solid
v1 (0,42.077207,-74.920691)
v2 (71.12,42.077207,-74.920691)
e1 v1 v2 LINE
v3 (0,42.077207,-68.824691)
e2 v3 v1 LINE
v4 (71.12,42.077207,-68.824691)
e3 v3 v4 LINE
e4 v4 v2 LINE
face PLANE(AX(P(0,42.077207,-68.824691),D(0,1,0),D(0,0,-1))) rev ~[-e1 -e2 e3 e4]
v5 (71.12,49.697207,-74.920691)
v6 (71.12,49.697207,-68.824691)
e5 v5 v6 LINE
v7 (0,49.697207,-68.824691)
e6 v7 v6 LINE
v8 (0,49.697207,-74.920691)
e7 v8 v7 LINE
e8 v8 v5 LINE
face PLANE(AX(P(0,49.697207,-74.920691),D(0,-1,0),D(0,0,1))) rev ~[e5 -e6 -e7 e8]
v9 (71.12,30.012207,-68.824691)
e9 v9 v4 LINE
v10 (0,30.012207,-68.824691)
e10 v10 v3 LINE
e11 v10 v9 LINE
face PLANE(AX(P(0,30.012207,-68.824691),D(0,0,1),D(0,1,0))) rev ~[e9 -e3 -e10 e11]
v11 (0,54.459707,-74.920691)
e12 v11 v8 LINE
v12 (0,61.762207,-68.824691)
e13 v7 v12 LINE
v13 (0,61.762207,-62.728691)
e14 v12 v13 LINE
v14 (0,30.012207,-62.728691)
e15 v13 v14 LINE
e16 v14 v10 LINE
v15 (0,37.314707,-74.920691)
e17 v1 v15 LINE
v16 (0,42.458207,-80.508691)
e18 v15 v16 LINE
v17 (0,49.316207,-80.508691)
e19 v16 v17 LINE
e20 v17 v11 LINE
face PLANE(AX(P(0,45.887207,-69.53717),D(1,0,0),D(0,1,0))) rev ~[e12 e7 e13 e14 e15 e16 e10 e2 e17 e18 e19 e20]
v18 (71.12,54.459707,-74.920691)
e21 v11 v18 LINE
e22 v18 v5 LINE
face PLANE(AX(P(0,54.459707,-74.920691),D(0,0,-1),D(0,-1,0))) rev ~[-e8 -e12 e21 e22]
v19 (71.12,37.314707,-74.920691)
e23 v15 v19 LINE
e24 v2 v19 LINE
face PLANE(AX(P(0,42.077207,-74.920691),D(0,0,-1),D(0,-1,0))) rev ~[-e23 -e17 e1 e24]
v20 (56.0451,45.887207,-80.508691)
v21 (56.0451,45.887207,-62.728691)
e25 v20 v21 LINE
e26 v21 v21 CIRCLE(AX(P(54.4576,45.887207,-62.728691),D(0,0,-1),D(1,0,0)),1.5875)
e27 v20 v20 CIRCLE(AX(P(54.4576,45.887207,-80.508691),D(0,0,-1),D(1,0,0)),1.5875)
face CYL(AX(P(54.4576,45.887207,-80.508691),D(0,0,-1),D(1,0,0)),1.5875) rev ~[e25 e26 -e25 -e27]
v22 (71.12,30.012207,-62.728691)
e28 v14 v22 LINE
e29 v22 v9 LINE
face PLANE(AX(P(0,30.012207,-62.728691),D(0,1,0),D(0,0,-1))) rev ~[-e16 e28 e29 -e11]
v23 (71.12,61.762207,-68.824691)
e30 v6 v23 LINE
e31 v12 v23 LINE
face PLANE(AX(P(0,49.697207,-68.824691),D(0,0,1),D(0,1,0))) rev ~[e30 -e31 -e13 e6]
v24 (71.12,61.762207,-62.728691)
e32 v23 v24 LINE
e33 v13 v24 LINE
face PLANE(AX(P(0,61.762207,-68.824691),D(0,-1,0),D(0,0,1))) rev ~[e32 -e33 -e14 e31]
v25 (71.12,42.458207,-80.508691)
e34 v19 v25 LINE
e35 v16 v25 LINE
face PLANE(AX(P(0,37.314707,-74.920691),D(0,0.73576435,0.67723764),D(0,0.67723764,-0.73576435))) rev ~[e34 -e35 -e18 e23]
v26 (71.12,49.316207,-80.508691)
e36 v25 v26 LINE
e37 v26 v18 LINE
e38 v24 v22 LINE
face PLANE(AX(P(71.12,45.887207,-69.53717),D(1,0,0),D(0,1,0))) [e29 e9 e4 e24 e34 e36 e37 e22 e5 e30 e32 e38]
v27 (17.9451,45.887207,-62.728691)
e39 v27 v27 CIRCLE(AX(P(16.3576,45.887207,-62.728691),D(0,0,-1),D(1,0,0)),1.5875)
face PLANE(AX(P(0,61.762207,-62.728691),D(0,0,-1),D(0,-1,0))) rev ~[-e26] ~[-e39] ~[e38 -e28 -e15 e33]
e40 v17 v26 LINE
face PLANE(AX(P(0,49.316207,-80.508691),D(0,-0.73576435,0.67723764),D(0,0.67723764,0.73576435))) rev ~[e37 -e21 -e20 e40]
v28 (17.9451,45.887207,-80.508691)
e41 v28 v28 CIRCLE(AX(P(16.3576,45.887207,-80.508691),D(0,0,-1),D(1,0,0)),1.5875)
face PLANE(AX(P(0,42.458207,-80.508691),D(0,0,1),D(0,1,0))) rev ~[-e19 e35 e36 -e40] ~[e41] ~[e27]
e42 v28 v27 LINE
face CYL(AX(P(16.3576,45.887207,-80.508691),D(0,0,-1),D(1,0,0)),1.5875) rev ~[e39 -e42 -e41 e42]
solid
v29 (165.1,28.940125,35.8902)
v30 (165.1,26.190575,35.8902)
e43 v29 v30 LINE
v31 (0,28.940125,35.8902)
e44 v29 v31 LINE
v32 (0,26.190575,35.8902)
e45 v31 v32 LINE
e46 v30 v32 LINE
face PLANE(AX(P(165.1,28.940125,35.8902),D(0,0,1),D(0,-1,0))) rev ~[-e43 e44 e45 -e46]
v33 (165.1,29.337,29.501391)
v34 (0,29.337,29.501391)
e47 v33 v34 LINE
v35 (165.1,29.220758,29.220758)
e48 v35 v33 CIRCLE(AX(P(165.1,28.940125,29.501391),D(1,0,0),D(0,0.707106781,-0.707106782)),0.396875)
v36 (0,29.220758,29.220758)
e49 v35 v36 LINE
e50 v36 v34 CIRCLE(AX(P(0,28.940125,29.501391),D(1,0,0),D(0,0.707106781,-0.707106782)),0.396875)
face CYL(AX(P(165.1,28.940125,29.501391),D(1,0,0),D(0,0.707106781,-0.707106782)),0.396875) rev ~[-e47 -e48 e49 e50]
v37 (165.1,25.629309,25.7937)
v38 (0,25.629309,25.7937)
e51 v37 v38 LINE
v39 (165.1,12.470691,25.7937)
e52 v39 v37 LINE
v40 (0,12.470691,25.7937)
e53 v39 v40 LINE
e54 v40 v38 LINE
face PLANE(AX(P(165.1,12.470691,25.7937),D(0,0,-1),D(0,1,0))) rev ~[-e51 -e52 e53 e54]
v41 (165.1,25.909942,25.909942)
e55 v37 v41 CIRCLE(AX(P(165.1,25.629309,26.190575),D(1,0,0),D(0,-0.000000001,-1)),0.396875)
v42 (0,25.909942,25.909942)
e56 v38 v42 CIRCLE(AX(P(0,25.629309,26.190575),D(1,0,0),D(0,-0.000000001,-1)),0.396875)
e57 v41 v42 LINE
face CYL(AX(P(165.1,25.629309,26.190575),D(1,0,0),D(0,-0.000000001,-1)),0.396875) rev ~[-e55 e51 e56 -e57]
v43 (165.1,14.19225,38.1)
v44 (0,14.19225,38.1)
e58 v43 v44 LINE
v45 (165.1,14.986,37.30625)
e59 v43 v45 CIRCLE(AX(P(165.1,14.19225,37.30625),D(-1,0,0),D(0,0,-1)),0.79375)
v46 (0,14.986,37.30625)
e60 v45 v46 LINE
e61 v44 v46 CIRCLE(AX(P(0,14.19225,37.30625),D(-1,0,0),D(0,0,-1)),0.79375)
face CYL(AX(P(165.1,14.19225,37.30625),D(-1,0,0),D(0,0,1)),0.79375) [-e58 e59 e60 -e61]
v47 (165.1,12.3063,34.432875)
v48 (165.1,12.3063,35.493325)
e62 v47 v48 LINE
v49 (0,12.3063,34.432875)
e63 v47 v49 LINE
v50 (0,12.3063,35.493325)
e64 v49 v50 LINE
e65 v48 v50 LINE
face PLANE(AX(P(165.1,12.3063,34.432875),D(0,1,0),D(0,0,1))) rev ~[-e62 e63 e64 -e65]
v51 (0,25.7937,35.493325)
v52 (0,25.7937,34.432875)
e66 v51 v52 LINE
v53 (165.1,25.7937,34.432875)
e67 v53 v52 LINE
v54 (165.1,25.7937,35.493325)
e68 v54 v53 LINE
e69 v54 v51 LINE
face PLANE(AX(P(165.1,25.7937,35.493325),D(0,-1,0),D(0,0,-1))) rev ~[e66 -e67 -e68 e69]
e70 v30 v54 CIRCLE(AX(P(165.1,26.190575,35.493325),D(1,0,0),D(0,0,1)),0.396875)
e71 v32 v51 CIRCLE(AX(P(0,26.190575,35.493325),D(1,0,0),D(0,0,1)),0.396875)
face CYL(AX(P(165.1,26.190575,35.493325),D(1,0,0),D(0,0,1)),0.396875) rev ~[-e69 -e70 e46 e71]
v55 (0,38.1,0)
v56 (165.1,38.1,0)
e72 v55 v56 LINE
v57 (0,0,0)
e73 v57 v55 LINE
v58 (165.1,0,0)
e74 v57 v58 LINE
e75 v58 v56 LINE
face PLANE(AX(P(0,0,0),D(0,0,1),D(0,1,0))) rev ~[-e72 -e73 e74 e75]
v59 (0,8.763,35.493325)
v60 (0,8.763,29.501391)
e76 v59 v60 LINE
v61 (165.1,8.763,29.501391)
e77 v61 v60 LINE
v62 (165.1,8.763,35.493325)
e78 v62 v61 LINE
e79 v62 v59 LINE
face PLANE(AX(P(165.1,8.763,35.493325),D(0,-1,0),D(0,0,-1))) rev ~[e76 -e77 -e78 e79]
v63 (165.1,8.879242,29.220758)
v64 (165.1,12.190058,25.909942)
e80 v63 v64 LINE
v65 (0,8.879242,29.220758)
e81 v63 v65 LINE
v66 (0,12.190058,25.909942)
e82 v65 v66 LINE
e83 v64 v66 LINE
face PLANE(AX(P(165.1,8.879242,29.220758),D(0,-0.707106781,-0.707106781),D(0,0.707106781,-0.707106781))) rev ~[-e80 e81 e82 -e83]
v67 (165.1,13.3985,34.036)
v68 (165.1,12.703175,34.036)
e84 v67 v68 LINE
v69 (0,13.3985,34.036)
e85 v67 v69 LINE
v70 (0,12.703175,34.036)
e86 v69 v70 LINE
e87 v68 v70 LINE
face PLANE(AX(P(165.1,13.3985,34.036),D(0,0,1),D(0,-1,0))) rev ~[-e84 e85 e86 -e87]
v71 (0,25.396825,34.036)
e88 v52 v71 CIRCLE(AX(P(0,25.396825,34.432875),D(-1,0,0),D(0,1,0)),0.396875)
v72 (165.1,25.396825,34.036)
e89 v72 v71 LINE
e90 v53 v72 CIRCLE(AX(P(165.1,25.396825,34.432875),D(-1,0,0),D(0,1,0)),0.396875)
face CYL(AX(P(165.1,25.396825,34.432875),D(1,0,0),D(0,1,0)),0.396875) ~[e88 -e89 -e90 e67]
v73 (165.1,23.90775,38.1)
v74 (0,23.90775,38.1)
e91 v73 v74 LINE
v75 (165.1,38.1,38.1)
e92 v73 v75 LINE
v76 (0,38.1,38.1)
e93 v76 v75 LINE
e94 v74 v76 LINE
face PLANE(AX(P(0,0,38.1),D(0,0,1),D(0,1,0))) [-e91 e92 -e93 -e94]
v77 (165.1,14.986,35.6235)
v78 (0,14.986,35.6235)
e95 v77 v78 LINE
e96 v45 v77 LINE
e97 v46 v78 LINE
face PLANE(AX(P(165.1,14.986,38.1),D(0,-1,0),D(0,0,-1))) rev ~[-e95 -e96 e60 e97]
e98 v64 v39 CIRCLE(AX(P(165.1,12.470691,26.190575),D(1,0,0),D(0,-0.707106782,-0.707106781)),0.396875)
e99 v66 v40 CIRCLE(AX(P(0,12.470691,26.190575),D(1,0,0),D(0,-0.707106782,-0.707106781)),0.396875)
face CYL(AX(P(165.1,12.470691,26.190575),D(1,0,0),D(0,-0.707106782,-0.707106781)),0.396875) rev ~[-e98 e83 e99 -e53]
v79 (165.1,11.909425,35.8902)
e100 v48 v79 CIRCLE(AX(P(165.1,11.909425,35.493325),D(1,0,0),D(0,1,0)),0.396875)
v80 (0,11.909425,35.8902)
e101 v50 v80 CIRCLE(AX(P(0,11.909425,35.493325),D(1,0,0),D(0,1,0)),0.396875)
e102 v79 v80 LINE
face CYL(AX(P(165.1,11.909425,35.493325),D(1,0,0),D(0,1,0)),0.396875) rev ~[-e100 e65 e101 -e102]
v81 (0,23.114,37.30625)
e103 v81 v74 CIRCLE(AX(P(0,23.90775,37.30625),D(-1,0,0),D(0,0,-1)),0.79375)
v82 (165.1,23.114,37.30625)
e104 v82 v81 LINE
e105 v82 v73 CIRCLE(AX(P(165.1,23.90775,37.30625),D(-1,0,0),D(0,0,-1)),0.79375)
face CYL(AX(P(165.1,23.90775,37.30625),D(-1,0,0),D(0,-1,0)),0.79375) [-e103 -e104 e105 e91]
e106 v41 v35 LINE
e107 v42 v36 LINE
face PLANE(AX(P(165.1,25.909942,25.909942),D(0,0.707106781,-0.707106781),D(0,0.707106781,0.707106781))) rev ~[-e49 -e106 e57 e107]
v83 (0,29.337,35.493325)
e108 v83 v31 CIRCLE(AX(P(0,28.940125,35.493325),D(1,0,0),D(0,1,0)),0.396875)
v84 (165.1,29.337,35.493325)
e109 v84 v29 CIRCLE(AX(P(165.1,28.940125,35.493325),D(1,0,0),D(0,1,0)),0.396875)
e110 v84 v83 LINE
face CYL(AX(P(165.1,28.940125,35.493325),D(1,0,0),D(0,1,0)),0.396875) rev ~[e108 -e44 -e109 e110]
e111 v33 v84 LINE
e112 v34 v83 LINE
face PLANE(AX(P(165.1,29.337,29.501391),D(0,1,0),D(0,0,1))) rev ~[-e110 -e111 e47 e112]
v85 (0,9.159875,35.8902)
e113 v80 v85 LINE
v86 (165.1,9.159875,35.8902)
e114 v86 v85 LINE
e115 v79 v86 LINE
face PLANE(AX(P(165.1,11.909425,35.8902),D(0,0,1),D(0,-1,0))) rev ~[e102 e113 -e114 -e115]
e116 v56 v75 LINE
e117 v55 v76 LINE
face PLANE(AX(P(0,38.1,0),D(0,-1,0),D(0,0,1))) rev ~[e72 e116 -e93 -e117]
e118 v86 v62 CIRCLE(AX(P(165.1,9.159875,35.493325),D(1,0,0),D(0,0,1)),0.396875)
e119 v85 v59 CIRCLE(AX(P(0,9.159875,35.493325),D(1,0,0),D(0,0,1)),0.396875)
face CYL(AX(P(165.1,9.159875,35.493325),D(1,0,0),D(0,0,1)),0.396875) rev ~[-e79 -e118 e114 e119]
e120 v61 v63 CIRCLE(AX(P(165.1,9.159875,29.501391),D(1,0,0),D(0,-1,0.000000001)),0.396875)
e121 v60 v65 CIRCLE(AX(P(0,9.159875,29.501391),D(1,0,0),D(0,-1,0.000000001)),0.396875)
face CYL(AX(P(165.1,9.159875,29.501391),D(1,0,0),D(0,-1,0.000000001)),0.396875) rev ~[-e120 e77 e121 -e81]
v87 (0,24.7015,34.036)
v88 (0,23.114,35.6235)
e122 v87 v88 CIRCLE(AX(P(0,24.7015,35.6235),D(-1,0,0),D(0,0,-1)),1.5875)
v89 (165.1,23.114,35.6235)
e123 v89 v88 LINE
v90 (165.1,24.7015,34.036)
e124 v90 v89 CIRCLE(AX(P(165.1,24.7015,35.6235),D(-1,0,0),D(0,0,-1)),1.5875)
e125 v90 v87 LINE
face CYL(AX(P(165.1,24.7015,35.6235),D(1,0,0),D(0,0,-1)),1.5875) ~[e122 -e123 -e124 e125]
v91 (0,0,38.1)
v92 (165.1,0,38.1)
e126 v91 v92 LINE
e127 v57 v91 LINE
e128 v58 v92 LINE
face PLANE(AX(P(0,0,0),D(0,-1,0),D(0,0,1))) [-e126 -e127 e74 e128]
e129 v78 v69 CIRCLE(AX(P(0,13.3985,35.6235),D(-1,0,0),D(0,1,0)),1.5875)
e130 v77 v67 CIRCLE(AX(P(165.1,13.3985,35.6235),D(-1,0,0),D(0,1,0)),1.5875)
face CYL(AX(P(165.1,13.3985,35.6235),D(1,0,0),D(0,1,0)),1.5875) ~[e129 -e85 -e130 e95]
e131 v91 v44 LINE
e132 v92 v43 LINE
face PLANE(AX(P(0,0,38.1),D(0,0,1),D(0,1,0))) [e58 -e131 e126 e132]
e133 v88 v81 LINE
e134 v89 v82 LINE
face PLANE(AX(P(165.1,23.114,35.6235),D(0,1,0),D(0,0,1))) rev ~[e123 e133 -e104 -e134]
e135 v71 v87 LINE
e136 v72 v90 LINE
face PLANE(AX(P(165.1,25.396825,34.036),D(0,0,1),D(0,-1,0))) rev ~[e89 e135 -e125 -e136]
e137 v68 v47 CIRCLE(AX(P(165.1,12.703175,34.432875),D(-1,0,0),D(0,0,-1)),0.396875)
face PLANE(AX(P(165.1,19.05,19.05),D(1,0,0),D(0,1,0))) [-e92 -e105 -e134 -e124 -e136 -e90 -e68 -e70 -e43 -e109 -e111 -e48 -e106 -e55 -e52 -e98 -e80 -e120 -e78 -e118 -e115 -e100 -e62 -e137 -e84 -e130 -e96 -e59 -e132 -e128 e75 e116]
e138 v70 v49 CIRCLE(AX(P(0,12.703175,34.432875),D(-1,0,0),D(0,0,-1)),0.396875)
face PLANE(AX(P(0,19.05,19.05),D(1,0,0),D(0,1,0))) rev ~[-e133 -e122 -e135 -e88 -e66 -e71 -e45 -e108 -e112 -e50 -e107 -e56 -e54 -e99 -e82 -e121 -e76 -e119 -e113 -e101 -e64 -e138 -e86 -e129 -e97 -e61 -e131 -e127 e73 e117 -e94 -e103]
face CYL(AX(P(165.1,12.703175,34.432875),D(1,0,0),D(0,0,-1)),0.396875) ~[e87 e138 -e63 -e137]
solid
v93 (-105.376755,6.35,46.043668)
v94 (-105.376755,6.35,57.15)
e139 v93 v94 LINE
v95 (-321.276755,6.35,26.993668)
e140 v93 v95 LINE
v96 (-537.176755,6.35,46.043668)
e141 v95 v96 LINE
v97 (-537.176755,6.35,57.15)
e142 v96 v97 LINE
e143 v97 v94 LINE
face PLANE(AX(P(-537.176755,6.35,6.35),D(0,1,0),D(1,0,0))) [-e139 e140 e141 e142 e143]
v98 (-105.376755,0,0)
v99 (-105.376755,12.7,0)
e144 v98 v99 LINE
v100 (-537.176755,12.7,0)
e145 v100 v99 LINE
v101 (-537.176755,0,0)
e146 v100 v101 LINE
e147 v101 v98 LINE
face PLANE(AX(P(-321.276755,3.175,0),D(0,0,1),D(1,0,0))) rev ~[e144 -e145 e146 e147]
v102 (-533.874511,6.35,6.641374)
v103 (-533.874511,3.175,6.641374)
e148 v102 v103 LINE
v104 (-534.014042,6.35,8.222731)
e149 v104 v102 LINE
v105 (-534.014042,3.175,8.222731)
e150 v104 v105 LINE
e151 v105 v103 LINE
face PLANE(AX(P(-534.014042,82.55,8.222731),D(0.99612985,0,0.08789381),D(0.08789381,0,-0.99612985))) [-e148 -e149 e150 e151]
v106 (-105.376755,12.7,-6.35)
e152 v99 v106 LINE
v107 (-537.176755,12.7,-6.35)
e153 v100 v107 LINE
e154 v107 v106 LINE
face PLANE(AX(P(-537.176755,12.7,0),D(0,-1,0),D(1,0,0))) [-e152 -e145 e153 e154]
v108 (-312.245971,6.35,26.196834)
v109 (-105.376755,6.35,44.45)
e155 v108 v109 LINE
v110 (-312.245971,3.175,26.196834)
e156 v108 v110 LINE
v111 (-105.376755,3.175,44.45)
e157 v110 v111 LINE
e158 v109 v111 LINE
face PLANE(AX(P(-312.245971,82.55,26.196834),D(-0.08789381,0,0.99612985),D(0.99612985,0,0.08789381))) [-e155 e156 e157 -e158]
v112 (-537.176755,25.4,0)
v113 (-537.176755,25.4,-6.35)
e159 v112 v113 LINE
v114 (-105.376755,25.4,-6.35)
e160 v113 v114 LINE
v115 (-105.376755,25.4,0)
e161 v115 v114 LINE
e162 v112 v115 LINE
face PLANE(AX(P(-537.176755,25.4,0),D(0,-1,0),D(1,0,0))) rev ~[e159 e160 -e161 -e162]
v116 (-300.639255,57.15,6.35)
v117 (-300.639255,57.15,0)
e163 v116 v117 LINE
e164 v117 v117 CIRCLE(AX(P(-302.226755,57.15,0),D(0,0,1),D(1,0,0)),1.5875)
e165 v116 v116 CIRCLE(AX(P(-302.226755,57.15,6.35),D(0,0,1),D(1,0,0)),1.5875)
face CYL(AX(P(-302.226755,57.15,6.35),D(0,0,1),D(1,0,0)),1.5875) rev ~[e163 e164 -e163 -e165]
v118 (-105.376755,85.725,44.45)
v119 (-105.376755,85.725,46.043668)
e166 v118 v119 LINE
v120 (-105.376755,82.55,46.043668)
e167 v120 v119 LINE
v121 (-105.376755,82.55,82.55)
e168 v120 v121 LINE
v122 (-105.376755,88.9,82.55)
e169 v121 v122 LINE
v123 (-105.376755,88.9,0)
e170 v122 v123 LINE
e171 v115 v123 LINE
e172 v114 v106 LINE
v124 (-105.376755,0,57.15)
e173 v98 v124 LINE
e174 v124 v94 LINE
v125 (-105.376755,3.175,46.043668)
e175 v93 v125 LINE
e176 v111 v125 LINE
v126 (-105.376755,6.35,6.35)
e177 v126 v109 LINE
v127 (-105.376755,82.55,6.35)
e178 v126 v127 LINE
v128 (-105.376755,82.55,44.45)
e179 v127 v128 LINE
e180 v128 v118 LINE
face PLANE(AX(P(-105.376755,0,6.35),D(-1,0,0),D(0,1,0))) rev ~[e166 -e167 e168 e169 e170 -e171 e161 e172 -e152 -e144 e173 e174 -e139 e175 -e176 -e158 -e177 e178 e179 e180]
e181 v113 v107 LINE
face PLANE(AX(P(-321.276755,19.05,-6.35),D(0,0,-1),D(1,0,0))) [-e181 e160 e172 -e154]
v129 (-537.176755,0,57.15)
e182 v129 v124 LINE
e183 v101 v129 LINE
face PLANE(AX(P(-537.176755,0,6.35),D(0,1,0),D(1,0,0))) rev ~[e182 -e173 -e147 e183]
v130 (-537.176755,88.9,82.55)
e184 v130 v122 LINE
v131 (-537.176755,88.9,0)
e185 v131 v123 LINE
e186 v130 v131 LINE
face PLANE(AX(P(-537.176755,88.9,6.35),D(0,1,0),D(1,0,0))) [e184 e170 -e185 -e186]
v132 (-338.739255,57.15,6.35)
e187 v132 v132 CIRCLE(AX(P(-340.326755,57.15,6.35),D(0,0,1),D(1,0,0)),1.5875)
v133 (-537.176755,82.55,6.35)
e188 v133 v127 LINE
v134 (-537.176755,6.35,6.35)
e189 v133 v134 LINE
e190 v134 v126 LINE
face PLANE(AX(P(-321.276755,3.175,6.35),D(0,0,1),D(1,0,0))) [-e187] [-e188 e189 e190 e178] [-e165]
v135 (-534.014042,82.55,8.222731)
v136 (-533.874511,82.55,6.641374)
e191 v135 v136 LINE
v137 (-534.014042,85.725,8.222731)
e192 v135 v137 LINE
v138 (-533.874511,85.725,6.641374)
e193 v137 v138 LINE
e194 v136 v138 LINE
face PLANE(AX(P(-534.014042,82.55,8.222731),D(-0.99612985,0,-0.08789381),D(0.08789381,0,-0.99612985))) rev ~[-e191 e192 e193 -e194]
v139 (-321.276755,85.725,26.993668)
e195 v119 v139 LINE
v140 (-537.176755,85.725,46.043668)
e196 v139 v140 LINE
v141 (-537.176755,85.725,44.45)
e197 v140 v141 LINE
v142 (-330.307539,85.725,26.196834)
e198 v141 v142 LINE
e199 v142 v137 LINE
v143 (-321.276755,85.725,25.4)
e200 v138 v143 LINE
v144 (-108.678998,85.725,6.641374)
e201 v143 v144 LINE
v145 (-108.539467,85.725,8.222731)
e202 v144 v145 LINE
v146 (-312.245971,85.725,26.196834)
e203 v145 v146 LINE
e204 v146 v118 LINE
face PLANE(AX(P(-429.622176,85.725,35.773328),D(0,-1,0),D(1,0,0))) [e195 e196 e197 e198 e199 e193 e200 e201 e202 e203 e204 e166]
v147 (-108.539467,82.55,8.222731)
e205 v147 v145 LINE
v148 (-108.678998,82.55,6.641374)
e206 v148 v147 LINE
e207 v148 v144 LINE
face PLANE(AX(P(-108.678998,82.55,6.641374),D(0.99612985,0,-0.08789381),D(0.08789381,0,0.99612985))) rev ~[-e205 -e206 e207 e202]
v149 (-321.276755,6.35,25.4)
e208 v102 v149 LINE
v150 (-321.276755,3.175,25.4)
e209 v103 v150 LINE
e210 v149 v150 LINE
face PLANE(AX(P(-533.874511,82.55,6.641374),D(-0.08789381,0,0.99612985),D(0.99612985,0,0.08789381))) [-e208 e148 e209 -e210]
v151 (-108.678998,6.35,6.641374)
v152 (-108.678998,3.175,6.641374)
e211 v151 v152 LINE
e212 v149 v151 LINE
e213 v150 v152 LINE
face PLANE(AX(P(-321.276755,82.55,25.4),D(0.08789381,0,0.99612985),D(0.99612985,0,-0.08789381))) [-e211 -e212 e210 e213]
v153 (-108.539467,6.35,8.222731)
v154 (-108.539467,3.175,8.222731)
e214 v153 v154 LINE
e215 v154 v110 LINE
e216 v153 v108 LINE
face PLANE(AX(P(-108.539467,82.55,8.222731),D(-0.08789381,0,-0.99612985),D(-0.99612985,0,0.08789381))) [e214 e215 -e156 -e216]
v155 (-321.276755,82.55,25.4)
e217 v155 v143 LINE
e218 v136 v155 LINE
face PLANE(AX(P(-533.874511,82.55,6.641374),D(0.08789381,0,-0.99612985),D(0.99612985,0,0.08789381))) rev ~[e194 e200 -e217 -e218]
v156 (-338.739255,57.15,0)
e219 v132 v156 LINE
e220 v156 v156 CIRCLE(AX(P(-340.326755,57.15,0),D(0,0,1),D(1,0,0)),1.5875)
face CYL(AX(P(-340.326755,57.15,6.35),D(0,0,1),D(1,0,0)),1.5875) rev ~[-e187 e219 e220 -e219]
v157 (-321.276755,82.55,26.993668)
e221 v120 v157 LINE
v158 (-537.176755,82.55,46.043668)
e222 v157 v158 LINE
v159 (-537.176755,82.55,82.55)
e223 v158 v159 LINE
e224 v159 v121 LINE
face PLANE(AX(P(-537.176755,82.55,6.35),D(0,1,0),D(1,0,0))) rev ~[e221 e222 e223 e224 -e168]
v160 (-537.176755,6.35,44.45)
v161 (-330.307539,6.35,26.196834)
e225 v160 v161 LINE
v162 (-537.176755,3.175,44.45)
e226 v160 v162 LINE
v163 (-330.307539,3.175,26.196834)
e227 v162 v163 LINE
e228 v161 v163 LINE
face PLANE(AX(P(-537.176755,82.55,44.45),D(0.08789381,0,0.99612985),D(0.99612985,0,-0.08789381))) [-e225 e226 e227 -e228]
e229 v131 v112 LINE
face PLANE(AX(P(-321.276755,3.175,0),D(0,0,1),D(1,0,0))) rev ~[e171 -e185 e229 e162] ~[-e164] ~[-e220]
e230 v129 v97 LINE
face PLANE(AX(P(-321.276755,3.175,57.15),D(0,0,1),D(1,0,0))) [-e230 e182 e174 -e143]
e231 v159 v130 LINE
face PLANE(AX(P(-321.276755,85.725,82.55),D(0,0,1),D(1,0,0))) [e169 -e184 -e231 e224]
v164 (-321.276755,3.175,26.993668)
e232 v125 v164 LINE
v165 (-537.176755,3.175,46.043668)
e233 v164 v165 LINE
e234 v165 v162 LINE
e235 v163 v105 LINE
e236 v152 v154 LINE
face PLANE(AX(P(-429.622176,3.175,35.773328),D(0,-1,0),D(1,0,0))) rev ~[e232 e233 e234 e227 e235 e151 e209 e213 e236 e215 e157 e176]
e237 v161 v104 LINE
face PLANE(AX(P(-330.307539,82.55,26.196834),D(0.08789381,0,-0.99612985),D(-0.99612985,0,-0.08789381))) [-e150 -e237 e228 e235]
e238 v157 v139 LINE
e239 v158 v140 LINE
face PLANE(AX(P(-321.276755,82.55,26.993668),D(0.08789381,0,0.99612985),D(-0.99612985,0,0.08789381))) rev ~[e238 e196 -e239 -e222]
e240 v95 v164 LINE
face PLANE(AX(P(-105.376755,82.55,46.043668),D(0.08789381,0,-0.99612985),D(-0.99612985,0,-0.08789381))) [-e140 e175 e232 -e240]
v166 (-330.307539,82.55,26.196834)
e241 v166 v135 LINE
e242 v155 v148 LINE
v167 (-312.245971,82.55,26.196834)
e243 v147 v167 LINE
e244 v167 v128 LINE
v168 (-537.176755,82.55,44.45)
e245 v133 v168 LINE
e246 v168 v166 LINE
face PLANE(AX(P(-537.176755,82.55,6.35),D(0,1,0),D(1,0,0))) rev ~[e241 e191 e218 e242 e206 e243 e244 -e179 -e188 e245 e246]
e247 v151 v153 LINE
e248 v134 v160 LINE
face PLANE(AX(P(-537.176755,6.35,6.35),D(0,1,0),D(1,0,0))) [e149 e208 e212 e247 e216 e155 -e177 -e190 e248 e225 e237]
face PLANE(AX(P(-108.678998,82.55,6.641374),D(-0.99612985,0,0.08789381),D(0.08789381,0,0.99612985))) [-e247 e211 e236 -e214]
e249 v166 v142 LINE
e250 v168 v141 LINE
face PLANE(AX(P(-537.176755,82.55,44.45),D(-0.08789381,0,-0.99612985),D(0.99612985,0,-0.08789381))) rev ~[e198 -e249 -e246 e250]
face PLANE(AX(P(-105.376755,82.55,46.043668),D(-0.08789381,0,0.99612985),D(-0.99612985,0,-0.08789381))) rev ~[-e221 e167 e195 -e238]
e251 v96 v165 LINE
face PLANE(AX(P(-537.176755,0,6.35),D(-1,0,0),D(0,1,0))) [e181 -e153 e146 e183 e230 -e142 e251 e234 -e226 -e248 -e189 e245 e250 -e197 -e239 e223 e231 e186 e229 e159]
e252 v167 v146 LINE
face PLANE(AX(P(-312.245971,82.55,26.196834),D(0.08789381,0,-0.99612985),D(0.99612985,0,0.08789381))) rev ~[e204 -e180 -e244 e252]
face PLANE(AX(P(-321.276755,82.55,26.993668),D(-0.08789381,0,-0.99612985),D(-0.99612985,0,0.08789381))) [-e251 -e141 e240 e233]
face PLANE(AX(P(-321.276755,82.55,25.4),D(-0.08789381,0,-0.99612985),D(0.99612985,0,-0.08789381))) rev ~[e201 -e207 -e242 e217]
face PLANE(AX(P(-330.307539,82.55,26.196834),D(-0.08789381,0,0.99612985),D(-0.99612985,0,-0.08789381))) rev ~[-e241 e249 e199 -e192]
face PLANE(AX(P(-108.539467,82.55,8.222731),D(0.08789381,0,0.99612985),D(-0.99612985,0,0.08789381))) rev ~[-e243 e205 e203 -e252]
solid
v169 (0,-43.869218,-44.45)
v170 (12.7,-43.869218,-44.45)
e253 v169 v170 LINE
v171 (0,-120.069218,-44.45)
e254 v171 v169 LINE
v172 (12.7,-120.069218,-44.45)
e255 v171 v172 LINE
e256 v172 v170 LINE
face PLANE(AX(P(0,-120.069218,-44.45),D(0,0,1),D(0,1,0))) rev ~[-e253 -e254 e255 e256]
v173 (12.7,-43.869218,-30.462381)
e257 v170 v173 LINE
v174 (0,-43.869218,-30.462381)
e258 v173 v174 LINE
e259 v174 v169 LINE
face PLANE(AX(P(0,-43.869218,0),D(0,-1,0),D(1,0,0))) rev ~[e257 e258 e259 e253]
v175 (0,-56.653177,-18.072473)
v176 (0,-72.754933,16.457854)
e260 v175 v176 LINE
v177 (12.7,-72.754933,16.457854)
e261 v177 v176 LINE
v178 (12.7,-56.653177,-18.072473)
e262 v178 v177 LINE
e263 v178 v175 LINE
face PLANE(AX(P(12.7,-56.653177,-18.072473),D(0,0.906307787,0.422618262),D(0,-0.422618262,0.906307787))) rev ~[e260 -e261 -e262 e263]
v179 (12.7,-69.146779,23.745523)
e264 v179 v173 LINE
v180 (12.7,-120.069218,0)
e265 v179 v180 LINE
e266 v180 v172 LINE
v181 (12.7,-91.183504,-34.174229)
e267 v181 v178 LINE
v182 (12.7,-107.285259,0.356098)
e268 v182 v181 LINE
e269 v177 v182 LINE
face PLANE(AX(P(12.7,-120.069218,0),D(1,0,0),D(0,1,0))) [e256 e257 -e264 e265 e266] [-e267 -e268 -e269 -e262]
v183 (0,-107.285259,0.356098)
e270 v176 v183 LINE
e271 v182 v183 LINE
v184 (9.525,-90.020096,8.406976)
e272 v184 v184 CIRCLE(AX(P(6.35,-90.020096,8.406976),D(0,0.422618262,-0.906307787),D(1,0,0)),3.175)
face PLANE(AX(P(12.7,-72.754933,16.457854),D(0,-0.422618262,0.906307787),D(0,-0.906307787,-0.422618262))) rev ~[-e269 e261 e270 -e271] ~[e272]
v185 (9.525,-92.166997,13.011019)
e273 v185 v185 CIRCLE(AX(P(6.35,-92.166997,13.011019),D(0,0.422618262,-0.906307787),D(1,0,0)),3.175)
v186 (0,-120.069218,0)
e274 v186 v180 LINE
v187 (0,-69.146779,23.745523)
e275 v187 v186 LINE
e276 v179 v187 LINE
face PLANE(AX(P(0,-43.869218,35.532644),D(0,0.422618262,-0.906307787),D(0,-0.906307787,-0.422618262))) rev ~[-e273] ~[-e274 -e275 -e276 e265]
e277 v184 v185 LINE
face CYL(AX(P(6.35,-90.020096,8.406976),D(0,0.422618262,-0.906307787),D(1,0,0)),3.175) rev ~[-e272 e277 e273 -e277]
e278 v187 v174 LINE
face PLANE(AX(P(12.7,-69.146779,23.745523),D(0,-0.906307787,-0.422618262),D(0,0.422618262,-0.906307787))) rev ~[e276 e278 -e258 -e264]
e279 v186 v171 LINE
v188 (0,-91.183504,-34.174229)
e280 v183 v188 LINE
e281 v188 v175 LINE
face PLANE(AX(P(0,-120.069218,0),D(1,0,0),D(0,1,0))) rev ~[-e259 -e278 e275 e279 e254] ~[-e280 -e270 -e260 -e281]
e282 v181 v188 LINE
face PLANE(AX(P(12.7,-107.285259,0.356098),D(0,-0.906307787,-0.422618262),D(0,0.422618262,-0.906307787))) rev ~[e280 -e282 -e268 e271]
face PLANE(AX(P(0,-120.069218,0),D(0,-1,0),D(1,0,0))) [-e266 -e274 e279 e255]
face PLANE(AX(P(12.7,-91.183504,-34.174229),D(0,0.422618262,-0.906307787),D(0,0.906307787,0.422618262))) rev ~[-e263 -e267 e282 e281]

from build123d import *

# Parameters (mm, degrees)
F0_W          = 38.1
F0_H          = 38.1
F1_DEPTH      = 165.1
F2_W          = 431.8
F2_H          = 6.35
F2_H_2        = 76.2
F3_DEPTH      = 6.35
F4_W          = 431.8
F4_H          = 6.35
F5_DEPTH      = 76.2
F6_W          = 431.8
F6_H          = 6.35
F7_DEPTH      = 50.8
F9_DEPTH      = 3.175
F9_DEPTH_BACK = 79.375
F10_W         = 431.8
F10_H         = 12.7
F11_DEPTH     = 6.35
F13_DEPTH     = 12.7
F14_DEPTH     = 44.45
F16_DEPTH     = 12.7
F17_R         = 3.175
F18_DEPTH     = 5.08
F20_DEPTH     = 165.1
F21_R         = 0.79375
F23_DEPTH     = 71.12
F24_R         = 1.5875
F25_DEPTH     = 17.78
F26_R         = 1.5875
F27_DEPTH     = 6.35
F29_DEPTH     = 12.7


# Not quite as in the source:
# - a feature names something its author has since deleted; it is built from what else it names


with BuildPart() as f1:
    # F0 (on Right) → F1 (new body)
    with BuildSketch(Plane.YZ):
        with Locations((19.05, 19.05)):
            Rectangle(F0_W, F0_H)
    extrude(amount=F1_DEPTH)

    # F19 (on face) → F20 (cut, through all)
    with BuildSketch(Plane.YZ.offset(165.1)):
        with BuildLine():
            Line((12.4706910076, 25.7937), (19.05, 25.7937))
            Line((19.05, 25.7937), (25.6293089924, 25.7937))
            ThreePointArc((25.6293089924, 25.7937), (25.7811864797, 25.8239103105), (25.9099419962, 25.9099419962))
            Line((25.9099419962, 25.9099419962), (29.2207580038, 29.2207580038))
            ThreePointArc((29.2207580038, 29.2207580038), (29.3067896895, 29.3495135203), (29.337, 29.5013910076))
            Line((29.337, 29.5013910076), (29.337, 35.493325))
            ThreePointArc((29.337, 35.493325), (29.2207580038, 35.7739580038), (28.940125, 35.8902))
            Line((28.940125, 35.8902), (26.190575, 35.8902))
            ThreePointArc((26.190575, 35.8902), (25.9099419962, 35.7739580038), (25.7937, 35.493325))
            Line((25.7937, 35.493325), (25.7937, 34.432875))
            ThreePointArc((25.7937, 34.432875), (25.6774580038, 34.1522419962), (25.396825, 34.036))
            Line((25.396825, 34.036), (24.7015, 34.036))
            ThreePointArc((24.7015, 34.036), (23.5789679849, 34.5009679849), (23.114, 35.6235))
            Line((23.114, 35.6235), (23.114, 38.1))
            Line((23.114, 38.1), (19.05, 38.1))
            Line((19.05, 38.1), (14.986, 38.1))
            Line((14.986, 38.1), (14.986, 35.6235))
            ThreePointArc((14.986, 35.6235), (14.5210320151, 34.5009679849), (13.3985, 34.036))
            Line((13.3985, 34.036), (12.703175, 34.036))
            ThreePointArc((12.703175, 34.036), (12.4225419962, 34.1522419962), (12.3063, 34.432875))
            Line((12.3063, 34.432875), (12.3063, 35.493325))
            ThreePointArc((12.3063, 35.493325), (12.1900580038, 35.7739580038), (11.909425, 35.8902))
            Line((11.909425, 35.8902), (9.159875, 35.8902))
            ThreePointArc((9.159875, 35.8902), (8.8792419962, 35.7739580038), (8.763, 35.493325))
            Line((8.763, 35.493325), (8.763, 29.5013910076))
            ThreePointArc((8.763, 29.5013910076), (8.7932103105, 29.3495135203), (8.8792419962, 29.2207580038))
            Line((8.8792419962, 29.2207580038), (12.1900580038, 25.9099419962))
            ThreePointArc((12.1900580038, 25.9099419962), (12.3188135203, 25.8239103105), (12.4706910076, 25.7937))
        make_face()
    extrude(amount=-F20_DEPTH, mode=Mode.SUBTRACT)

    # F21
    f21_edges = [f1.edges().sort_by_distance(p)[0] for p in [
        (82.55, 14.986, 38.1),
        (82.55, 23.114, 38.1),
    ]]
    fillet(f21_edges, radius=F21_R)


with BuildPart() as f3:
    # F2 (on Top) → F3 (new body)
    with BuildSketch(Plane.XY):
        with Locations((-321.2767546883, 3.175)):
            Rectangle(F2_W, F2_H)
        with Locations((-321.2767546883, 44.45)):
            Rectangle(F2_W, F2_H_2)
        with Locations((-321.2767546883, 85.725)):
            Rectangle(F2_W, F2_H)
    extrude(amount=F3_DEPTH)

    # F4 (on face) → F5 (join)
    with BuildSketch(Plane.XY.offset(6.35)):
        with Locations((-321.2767546883, 85.725)):
            Rectangle(F4_W, F4_H)
    extrude(amount=F5_DEPTH)

    # F6 (on face) → F7 (join)
    with BuildSketch(Plane.XY.offset(6.35)):
        with Locations((-321.2767546883, 3.175)):
            Rectangle(F6_W, F6_H)
    extrude(amount=F7_DEPTH)

    # F8 (on face) → F9 (cut, two sides)
    with BuildSketch(Plane.XZ.offset(-82.55)) as f9_sk:
        Polygon((-537.1767546883, 44.45), (-330.3075385094, 26.1968338666), (-321.2767546883, 26.9936677331), (-537.1767546883, 46.0436677331), align=None)
        Polygon((-321.2767546883, 26.9936677331), (-312.2459708672, 26.1968338666), (-105.3767546883, 44.45), (-105.3767546883, 46.0436677331), align=None)
        Polygon((-321.2767546883, 25.4), (-108.678998386, 6.6413744439), (-108.5394669621, 8.2227305808), (-312.2459708672, 26.1968338666), align=None)
        Polygon((-330.3075385094, 26.1968338666), (-321.2767546883, 25.4), (-312.2459708672, 26.1968338666), (-321.2767546883, 26.9936677331), align=None)
        Polygon((-533.8745109906, 6.6413744439), (-321.2767546883, 25.4), (-330.3075385094, 26.1968338666), (-534.0140424144, 8.2227305808), align=None)
    extrude(amount=-F9_DEPTH, mode=Mode.SUBTRACT)
    extrude(f9_sk.sketch, amount=F9_DEPTH_BACK, mode=Mode.SUBTRACT)

    # F10 (on face) → F11 (join)
    with BuildSketch(Plane(origin=(0, 0, 0), x_dir=(1, 0, 0), z_dir=(0, 0, -1))):
        with Locations((-321.2767546883, -19.05)):
            Rectangle(F10_W, F10_H)
    extrude(amount=F11_DEPTH)

    # F26 (on face) → F27 (cut, through all)
    with BuildSketch(Plane.XY.offset(6.35)):
        with Locations((-302.2267546883, 57.15)):
            Circle(F26_R)
        with Locations((-340.3267546883, 57.15)):
            Circle(F26_R)
    extrude(amount=-F27_DEPTH, mode=Mode.SUBTRACT)


with BuildPart() as f13:
    # F12 (on Right) → F13 (new body)
    with BuildSketch(Plane.YZ):
        Polygon((-120.0692180491, 0), (-43.8692180491, 0), (-43.8692180491, 35.5326435514), align=None)
    extrude(amount=F13_DEPTH)

    # F14 (add): a face of the model
    f14_faces = [f13.faces().sort_by_distance(p)[0] for p in [
        (6.35, -81.9692180491, 0),
    ]]
    extrude(f14_faces, amount=F14_DEPTH)

    # F15 (on face) → F16 (cut, through all)
    with BuildSketch(Plane.YZ.offset(12.7)):
        Polygon((-56.6531768199, -18.0724728657), (-72.7549325922, 16.4578538203), (-107.2852592783, 0.356098048), (-91.1835035059, -34.1742286381), align=None)
    extrude(amount=-F16_DEPTH, mode=Mode.SUBTRACT)

    # F17 (on face) → F18 (cut, through all)
    with BuildSketch(Plane(origin=(0, -19.2982054215, 41.3851350799), x_dir=(1, 0, 0), z_dir=(0, 0.4226182617, -0.906307787))):
        with Locations((6.35, 78.0329723801)):
            Circle(F17_R)
    extrude(amount=-F18_DEPTH, mode=Mode.SUBTRACT)

    # F28 (on face) → F29 (cut, through all)
    with BuildSketch(Plane.YZ.offset(12.7)):
        Polygon((-43.8692180491, 35.5326435514), (-69.1467789141, 23.7455233405), (-43.8692180491, -30.4623808682), align=None)
    extrude(amount=-F29_DEPTH, mode=Mode.SUBTRACT)


with BuildPart() as f23:
    # F22 (on Right) → F23 (new body)
    with BuildSketch(Plane.YZ):
        Polygon((61.7622073192, -62.7286910119), (30.0122073192, -62.7286910119), (30.0122073192, -68.8246910119), (42.0772073192, -68.8246910119), (42.0772073192, -74.9206910119), (37.3147073192, -74.9206910119), (42.4582073192, -80.5086910119), (49.3162073192, -80.5086910119), (54.4597073192, -74.9206910119), (49.6972073192, -74.9206910119), (49.6972073192, -68.8246910119), (61.7622073192, -68.8246910119), align=None)
    extrude(amount=F23_DEPTH)

    # F24 (on face) → F25 (cut, through all)
    with BuildSketch(Plane(origin=(0, 0, -80.5086910119), x_dir=(1, 0, 0), z_dir=(0, 0, -1))):
        with Locations((54.4576, -45.8872073192)):
            Circle(F24_R)
        with Locations((16.3576, -45.8872073192)):
            Circle(F24_R)
    extrude(amount=-F25_DEPTH, mode=Mode.SUBTRACT)


solid = Compound([f1.part, f3.part, f13.part, f23.part])
